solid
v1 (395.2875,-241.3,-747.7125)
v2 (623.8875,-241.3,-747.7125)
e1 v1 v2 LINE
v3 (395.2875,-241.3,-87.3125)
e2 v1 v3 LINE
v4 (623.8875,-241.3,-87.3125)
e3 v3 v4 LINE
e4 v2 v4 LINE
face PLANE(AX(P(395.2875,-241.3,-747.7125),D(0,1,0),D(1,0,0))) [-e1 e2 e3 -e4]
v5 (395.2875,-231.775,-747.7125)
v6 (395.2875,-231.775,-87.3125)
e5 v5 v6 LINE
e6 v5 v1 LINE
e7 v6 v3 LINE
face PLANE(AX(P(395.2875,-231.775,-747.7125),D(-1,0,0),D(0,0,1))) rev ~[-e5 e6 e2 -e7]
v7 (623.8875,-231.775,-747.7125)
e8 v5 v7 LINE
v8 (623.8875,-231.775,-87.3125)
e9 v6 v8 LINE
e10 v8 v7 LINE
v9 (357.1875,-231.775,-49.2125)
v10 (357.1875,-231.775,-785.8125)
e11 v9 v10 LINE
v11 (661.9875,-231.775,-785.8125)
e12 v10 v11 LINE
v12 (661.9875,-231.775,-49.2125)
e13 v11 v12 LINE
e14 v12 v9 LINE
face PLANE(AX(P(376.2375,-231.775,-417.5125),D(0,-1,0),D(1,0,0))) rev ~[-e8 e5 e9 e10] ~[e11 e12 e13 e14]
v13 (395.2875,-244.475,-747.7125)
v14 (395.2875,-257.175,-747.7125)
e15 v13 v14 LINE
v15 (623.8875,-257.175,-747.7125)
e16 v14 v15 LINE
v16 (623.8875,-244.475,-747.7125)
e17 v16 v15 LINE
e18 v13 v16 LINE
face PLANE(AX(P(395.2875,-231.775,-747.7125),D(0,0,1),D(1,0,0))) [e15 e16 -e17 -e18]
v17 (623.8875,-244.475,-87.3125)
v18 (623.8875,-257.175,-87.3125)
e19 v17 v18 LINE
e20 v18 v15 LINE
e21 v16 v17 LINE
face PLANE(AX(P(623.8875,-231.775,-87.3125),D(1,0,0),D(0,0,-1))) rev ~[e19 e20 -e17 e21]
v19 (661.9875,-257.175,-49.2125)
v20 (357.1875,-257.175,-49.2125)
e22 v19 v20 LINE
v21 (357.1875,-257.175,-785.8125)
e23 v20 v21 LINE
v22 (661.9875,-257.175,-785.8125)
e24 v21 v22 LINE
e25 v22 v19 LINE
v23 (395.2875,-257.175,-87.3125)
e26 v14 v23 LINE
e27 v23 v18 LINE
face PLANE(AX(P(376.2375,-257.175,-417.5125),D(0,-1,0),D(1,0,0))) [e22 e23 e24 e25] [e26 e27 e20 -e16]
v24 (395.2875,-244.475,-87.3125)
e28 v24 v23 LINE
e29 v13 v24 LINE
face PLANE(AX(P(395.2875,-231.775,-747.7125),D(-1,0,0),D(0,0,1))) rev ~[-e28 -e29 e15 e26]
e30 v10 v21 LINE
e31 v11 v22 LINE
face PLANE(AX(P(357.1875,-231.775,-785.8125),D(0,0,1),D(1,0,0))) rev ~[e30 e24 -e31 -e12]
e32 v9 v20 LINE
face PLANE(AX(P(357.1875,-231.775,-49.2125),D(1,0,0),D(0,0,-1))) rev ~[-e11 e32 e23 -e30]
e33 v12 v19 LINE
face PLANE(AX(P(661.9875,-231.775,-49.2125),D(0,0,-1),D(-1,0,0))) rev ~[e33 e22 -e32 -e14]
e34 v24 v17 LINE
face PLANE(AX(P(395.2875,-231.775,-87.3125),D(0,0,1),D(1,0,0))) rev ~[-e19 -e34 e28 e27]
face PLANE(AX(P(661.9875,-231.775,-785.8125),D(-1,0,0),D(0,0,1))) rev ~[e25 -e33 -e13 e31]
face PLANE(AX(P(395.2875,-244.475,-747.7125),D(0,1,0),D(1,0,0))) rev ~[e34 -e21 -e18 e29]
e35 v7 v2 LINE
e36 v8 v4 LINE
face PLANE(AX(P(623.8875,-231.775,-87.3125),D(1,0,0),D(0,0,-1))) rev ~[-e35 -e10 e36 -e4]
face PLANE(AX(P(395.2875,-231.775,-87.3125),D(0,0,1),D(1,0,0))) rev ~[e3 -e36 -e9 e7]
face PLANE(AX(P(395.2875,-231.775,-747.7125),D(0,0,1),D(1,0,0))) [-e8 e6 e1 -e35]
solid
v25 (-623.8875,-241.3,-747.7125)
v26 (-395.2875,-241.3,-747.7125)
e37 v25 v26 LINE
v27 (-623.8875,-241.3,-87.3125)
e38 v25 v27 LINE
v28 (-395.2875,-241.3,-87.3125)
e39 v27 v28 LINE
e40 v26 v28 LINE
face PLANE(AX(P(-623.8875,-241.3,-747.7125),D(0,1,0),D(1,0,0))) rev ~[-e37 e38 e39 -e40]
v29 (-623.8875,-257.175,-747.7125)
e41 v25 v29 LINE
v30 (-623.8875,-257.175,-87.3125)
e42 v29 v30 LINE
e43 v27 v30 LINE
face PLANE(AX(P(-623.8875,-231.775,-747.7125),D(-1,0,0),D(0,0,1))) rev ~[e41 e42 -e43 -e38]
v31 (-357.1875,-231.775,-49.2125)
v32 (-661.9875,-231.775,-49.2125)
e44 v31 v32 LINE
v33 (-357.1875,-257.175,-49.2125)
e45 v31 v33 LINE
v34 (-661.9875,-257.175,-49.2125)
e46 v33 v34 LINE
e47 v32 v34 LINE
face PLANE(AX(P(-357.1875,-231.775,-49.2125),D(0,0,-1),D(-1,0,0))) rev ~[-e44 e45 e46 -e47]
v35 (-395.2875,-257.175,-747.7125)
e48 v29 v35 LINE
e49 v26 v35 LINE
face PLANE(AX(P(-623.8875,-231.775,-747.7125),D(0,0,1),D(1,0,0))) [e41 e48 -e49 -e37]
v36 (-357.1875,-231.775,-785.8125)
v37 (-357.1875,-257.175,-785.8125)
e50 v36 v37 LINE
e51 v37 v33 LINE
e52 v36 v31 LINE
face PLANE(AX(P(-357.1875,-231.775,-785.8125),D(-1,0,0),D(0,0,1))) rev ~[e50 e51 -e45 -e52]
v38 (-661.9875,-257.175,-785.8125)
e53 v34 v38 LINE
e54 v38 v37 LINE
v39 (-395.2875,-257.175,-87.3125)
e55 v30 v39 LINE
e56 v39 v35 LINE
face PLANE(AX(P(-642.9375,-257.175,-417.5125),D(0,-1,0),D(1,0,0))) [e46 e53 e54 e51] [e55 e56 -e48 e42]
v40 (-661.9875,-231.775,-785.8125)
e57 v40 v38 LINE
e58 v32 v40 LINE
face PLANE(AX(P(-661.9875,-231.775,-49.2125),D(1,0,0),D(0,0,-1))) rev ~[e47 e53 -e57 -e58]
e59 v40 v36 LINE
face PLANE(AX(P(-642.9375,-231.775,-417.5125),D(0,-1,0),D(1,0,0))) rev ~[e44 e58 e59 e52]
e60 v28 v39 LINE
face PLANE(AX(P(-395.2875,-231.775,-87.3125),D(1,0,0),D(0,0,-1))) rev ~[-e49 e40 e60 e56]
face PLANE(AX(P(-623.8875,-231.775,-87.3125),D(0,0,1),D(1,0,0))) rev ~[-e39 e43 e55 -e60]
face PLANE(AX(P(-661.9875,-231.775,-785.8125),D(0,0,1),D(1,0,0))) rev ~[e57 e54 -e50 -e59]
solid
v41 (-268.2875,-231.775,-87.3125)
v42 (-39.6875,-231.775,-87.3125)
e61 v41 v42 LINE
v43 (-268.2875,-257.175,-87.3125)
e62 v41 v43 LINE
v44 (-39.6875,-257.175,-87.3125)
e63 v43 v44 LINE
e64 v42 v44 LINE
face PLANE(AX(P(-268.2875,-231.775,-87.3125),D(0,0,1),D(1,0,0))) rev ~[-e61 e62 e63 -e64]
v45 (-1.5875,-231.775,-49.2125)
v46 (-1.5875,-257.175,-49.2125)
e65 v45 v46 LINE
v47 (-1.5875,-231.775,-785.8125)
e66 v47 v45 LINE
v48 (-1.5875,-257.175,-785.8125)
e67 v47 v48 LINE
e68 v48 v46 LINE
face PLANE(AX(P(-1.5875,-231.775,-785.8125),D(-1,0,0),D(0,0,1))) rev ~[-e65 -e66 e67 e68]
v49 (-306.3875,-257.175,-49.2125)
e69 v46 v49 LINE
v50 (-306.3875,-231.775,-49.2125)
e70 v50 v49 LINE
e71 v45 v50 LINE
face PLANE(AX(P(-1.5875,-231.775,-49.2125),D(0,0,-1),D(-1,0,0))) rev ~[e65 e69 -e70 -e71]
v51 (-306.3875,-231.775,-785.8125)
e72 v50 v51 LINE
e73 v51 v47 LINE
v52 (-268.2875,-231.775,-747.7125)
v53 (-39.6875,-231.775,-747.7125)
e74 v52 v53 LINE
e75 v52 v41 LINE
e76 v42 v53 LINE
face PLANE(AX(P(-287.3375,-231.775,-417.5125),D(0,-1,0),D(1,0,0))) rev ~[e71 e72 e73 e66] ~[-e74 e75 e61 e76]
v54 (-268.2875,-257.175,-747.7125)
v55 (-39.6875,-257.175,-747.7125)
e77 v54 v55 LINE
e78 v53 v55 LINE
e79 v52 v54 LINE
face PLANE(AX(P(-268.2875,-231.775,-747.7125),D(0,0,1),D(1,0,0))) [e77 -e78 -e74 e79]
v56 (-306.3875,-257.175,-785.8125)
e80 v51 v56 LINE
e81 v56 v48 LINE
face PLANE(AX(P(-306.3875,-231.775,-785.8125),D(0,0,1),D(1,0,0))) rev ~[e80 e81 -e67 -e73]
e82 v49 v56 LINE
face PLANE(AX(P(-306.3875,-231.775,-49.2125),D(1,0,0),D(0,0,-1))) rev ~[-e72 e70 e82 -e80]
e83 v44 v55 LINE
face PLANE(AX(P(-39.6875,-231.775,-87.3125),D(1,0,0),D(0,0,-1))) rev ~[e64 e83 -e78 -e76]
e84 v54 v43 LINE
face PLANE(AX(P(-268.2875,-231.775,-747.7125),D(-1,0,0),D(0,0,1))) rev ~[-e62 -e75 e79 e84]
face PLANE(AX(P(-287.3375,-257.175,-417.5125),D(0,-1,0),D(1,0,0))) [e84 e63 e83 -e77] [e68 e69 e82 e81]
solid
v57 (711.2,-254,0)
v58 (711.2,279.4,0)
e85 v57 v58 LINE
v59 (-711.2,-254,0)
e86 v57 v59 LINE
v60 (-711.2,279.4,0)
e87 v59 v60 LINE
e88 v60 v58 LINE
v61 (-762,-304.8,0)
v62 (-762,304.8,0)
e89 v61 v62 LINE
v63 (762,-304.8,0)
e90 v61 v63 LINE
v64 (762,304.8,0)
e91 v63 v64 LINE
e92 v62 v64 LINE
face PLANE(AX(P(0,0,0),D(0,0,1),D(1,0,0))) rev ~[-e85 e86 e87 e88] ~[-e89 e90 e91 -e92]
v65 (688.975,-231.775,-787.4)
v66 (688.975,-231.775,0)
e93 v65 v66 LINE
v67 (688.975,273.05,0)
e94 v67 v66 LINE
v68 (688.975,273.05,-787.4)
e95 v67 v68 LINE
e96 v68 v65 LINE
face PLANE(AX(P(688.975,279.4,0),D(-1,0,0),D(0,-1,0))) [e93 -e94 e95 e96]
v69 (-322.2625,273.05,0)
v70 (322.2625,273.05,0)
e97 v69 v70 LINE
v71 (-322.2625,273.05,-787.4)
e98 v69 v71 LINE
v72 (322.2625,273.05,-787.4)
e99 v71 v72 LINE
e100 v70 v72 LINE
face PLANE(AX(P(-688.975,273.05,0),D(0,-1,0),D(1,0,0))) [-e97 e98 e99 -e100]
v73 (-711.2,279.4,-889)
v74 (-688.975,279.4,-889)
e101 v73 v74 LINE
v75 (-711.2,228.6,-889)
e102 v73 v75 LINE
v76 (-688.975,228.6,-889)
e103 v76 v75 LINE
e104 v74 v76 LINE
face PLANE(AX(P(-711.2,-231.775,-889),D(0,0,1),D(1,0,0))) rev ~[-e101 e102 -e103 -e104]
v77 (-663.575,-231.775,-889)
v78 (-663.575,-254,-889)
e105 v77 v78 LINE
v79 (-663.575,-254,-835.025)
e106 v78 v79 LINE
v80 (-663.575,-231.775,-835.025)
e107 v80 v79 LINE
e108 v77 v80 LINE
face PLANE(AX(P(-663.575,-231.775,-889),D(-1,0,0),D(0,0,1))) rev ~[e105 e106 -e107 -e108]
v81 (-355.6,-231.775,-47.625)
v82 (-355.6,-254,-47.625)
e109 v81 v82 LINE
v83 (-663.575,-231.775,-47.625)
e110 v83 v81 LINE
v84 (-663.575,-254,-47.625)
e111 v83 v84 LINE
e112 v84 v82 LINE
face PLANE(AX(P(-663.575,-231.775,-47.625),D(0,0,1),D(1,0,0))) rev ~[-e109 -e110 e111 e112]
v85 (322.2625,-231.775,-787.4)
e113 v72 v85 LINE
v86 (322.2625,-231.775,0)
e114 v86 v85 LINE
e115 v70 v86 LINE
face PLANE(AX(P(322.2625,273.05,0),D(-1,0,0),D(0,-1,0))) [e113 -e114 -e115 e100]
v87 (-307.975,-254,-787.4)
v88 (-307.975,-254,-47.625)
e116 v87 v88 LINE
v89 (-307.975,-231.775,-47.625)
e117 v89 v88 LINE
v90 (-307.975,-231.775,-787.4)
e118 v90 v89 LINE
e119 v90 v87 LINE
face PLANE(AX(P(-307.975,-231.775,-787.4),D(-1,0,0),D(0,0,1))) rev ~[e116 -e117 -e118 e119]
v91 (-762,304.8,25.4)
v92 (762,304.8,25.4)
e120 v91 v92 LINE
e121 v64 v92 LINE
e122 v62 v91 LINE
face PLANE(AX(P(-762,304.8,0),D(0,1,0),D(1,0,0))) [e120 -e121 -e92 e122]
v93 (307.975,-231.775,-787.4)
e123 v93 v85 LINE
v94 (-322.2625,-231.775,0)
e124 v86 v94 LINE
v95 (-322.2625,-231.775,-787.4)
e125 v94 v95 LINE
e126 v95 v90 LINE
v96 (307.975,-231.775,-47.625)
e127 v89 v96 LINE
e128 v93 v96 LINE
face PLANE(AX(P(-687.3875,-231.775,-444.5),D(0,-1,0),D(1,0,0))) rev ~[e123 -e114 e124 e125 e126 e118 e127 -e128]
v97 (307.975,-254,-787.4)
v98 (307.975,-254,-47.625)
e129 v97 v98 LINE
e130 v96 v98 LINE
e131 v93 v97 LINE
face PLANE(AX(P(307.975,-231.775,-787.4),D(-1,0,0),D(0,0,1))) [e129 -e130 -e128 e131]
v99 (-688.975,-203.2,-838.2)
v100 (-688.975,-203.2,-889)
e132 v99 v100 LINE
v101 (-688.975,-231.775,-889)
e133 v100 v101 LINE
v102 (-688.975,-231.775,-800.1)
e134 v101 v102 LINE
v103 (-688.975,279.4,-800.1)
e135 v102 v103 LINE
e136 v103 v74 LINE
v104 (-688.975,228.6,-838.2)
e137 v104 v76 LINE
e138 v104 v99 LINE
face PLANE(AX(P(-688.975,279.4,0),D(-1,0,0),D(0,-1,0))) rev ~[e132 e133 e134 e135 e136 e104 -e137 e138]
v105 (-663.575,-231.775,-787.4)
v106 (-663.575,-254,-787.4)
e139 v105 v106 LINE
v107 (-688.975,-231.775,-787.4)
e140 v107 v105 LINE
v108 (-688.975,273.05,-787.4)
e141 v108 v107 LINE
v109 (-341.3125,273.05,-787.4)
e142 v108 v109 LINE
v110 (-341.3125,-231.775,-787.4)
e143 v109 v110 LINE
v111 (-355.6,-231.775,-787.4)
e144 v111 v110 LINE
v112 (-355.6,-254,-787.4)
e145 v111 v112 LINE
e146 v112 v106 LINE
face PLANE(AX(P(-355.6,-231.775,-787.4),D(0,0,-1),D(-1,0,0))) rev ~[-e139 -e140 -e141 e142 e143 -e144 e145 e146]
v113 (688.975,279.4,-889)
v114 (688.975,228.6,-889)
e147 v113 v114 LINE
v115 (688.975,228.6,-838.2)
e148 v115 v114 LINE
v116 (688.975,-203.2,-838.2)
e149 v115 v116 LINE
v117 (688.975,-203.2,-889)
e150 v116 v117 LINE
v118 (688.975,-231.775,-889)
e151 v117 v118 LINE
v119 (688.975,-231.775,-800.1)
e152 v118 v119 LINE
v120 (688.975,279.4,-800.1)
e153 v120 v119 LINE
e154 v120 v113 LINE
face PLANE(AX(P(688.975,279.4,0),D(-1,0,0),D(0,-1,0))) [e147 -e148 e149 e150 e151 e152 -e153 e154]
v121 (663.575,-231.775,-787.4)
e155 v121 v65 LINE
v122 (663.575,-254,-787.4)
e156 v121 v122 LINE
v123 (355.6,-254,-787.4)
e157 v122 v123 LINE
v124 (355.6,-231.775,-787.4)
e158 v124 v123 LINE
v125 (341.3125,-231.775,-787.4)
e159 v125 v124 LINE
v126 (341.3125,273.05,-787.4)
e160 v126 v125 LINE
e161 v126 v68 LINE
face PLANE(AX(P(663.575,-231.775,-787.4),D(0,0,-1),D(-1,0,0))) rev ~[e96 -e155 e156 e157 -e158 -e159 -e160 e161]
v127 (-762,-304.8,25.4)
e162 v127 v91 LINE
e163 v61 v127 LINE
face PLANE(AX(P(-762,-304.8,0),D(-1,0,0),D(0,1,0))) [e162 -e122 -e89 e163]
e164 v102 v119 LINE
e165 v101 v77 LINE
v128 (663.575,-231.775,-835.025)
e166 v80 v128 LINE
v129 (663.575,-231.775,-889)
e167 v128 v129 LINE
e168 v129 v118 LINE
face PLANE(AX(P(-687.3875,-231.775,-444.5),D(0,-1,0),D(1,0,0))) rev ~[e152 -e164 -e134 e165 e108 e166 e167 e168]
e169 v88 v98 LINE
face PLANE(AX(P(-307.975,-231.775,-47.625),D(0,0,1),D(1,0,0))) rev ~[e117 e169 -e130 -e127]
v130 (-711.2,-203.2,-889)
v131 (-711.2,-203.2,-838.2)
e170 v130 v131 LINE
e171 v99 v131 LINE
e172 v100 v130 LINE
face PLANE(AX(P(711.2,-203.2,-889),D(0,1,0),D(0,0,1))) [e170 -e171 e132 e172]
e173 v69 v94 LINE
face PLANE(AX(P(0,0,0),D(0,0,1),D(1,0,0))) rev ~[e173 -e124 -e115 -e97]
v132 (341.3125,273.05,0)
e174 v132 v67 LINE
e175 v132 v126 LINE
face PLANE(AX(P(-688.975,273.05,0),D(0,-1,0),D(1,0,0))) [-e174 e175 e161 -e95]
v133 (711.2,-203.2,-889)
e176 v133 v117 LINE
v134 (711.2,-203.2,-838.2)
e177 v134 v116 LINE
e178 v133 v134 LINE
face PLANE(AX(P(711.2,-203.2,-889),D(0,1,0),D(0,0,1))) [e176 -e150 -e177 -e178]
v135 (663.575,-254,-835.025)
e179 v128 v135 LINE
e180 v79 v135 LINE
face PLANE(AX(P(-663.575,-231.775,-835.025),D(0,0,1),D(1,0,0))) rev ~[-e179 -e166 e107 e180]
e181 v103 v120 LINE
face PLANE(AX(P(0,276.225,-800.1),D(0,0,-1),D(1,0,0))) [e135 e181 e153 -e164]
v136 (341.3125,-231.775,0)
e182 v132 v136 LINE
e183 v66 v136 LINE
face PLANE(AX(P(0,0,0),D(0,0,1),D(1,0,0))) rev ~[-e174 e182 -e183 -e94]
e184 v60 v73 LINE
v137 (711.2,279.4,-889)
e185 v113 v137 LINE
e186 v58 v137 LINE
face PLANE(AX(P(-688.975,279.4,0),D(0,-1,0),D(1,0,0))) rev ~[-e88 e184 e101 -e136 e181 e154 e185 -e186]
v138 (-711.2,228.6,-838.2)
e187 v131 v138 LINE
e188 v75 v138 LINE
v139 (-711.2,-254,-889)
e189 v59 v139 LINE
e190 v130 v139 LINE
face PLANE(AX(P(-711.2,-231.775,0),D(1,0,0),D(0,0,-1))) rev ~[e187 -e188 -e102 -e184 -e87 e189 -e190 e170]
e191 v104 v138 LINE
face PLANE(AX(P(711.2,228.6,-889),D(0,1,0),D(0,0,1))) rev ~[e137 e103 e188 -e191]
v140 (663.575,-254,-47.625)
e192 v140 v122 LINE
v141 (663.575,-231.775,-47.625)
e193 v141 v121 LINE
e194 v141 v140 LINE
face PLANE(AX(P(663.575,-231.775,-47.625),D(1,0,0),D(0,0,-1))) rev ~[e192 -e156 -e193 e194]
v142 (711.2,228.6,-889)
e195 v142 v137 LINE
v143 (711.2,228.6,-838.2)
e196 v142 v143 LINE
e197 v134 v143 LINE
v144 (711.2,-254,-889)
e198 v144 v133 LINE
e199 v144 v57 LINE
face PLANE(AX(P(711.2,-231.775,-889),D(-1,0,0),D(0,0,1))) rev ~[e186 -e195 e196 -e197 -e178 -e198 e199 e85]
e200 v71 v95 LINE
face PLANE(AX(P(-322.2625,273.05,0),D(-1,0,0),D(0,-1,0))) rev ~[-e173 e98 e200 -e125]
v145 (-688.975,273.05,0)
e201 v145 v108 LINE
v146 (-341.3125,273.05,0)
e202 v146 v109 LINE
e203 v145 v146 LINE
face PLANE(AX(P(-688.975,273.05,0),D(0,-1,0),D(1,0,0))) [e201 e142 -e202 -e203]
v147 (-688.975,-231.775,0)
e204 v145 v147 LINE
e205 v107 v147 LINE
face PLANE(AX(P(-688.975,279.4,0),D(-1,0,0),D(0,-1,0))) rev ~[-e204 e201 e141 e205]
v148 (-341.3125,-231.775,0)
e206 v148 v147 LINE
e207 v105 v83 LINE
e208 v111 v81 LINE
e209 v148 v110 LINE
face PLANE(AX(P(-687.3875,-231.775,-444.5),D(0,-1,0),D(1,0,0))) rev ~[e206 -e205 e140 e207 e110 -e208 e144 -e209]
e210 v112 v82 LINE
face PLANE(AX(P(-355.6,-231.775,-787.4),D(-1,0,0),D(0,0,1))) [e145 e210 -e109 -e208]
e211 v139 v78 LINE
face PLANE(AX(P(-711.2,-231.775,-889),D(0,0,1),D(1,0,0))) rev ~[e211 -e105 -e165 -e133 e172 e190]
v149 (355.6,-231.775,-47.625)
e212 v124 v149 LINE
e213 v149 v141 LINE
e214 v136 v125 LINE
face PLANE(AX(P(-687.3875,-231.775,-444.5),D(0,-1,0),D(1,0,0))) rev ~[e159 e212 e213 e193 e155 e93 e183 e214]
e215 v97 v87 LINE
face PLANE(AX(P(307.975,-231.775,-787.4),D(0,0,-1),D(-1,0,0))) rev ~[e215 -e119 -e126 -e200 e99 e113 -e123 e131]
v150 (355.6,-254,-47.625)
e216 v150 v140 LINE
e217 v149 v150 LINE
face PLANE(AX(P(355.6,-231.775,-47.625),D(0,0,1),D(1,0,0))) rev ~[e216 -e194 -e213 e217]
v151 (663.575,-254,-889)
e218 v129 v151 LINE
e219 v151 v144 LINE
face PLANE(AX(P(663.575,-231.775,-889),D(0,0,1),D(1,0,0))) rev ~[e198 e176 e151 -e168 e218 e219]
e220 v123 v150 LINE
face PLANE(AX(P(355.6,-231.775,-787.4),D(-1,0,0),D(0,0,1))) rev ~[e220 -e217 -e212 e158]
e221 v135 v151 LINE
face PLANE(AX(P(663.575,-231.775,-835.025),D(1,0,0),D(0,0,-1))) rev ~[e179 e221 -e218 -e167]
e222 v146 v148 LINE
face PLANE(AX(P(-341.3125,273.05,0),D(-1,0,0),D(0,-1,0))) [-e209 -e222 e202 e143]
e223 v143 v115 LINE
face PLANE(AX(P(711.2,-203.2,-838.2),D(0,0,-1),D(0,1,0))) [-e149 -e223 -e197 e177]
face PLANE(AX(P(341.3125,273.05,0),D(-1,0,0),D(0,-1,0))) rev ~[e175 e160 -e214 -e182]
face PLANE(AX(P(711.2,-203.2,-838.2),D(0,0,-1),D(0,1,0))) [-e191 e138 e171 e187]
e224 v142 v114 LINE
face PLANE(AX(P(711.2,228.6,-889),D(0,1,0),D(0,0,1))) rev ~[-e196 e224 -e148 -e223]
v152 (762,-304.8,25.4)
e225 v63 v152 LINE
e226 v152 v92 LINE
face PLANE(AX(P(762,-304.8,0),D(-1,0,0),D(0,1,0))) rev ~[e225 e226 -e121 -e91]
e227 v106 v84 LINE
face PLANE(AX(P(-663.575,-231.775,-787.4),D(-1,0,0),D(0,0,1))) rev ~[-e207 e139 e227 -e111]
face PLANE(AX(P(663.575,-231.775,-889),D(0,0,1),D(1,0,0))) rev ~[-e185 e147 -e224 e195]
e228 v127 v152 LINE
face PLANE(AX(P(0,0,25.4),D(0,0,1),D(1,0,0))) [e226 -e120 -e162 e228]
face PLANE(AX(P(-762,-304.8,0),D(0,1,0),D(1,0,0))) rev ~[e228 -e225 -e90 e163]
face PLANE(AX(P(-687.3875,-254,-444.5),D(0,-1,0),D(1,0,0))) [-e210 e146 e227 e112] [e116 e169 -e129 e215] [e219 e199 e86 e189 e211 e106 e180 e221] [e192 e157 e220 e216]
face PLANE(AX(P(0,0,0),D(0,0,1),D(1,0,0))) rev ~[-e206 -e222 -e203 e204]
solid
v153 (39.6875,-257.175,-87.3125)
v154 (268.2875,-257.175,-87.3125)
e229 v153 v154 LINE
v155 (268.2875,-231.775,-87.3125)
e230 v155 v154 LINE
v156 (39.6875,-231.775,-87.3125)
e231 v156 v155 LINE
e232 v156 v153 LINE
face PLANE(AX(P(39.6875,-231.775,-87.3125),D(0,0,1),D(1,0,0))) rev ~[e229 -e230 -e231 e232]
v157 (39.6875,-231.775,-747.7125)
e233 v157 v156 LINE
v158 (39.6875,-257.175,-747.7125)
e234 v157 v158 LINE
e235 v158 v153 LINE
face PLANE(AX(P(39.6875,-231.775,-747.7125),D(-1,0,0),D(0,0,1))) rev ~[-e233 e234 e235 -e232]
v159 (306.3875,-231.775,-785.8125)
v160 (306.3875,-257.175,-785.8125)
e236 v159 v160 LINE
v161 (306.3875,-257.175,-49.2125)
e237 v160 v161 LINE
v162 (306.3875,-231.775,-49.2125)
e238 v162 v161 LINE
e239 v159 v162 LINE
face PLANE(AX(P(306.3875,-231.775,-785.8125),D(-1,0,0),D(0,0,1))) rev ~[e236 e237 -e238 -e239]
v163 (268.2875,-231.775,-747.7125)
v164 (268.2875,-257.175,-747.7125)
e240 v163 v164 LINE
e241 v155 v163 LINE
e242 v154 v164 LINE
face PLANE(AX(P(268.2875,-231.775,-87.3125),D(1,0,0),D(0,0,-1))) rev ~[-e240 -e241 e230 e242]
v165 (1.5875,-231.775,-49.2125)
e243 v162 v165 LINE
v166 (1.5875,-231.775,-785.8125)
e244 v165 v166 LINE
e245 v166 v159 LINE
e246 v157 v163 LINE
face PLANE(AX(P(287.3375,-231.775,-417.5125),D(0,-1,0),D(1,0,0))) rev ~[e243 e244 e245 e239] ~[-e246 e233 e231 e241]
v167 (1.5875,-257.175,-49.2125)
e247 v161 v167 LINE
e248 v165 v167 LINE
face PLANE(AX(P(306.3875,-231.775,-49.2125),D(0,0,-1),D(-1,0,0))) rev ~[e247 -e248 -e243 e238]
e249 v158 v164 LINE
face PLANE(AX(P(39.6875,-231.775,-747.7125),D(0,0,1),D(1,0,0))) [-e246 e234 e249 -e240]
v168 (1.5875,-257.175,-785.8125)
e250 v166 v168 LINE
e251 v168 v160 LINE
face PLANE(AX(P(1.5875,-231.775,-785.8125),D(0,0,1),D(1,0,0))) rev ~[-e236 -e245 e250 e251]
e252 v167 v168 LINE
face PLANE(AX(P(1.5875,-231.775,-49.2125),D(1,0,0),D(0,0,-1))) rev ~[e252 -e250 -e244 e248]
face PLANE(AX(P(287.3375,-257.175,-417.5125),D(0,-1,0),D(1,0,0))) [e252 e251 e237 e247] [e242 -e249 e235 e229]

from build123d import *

# Parameters (mm, degrees)
F0_W      = 1524
F0_H      = 609.6
F1_DEPTH  = 25.4
F2_W      = 22.225
F2_H      = 511.175
F3_DEPTH  = 889
F2_W_2    = 19.05
F2_H_2    = 504.825
F4_DEPTH  = 787.4
F6_W      = 1377.95
F6_H      = 504.825
F7_DEPTH  = 12.7
F9_W      = 47.625
F9_H      = 739.775
F10_DEPTH = 22.225
F11_W     = 228.6
F11_H     = 38.1
F12_DEPTH = 25.4
F13_W     = 1377.95
F13_H     = 6.35
F14_DEPTH = 800.1
F15_W     = 228.6
F15_H     = 9.525
F16_DEPTH = 660.4
F15_H_2   = 3.175
F17_DEPTH = 660.4
F18_W     = 431.8
F18_H     = 50.8
F19_DEPTH = 1473.201


with BuildPart() as f1:
    # F0 (on Top) → F1 (new body)
    with BuildSketch(Plane.XY):
        Rectangle(F0_W, F0_H)
    extrude(amount=F1_DEPTH)

    # F2 (on face) → F3 (join)
    with BuildSketch(Plane(origin=(0, 0, 0), x_dir=(1, 0, 0), z_dir=(0, 0, -1))):
        with Locations((-700.0875, -23.8125)):
            Rectangle(F2_W, F2_H)
        with Locations((700.0875, -23.8125)):
            Rectangle(F2_W, F2_H)
    extrude(amount=F3_DEPTH)

    # F2 (on face) → F4 (join)
    with BuildSketch(Plane(origin=(0, 0, 0), x_dir=(1, 0, 0), z_dir=(0, 0, -1))):
        with Locations((-700.0875, -23.8125)):
            Rectangle(F2_W, F2_H)
        with Locations((700.0875, -23.8125)):
            Rectangle(F2_W, F2_H)
        with Locations((-331.7875, -20.6375)):
            Rectangle(F2_W_2, F2_H_2)
        with Locations((331.7875, -20.6375)):
            Rectangle(F2_W_2, F2_H_2)
    extrude(amount=F4_DEPTH)

    # F6 (on offset) → F7 (join)
    with BuildSketch(Plane(origin=(0, 0, -787.4), x_dir=(1, 0, 0), z_dir=(0, 0, -1))):
        with Locations((0, -20.6375)):
            Rectangle(F6_W, F6_H)
    extrude(amount=F7_DEPTH)

    # F9 (on offset) → F10 (join)
    with BuildSketch(Plane.XZ.offset(231.775)):
        Polygon((-663.575, 0), (-711.2, 0), (-711.2, -889), (-663.575, -889), (-663.575, -835.025), (-663.575, -787.4), (-663.575, -47.625), align=None)
        Polygon((663.575, 0), (-663.575, 0), (-663.575, -47.625), (-355.6, -47.625), (-307.975, -47.625), (307.975, -47.625), (355.6, -47.625), (663.575, -47.625), align=None)
        Polygon((711.2, 0), (663.575, 0), (663.575, -47.625), (663.575, -787.4), (663.575, -835.025), (663.575, -889), (711.2, -889), align=None)
        Polygon((-355.6, -787.4), (-663.575, -787.4), (-663.575, -835.025), (663.575, -835.025), (663.575, -787.4), (355.6, -787.4), (307.975, -787.4), (-307.975, -787.4), align=None)
        with Locations((-331.7875, -417.5125)):
            Rectangle(F9_W, F9_H)
        with Locations((331.7875, -417.5125)):
            Rectangle(F9_W, F9_H)
    extrude(amount=F10_DEPTH)

    # F13 (on face) → F14 (join, through all)
    with BuildSketch(Plane(origin=(0, 0, 0), x_dir=(1, 0, 0), z_dir=(0, 0, -1))):
        with Locations((0, -276.225)):
            Rectangle(F13_W, F13_H)
    extrude(amount=F14_DEPTH)

    # F18 (on face) → F19 (cut, through all)
    with BuildSketch(Plane.YZ.offset(711.2)):
        with Locations((12.7, -863.6)):
            Rectangle(F18_W, F18_H)
    extrude(amount=-F19_DEPTH, mode=Mode.SUBTRACT)


with BuildPart() as f12:
    # F11 (on offset) → F12 (new body)
    with BuildSketch(Plane.XZ.offset(231.775)):
        Polygon((-623.8875, -49.2125), (-661.9875, -49.2125), (-661.9875, -785.8125), (-623.8875, -785.8125), (-623.8875, -747.7125), (-623.8875, -87.3125), align=None)
        with Locations((-509.5875, -68.2625)):
            Rectangle(F11_W, F11_H)
        Polygon((-357.1875, -49.2125), (-395.2875, -49.2125), (-395.2875, -87.3125), (-395.2875, -747.7125), (-395.2875, -785.8125), (-357.1875, -785.8125), align=None)
        with Locations((-509.5875, -766.7625)):
            Rectangle(F11_W, F11_H)
    extrude(amount=F12_DEPTH)

    # F15 (on face) → F16 (join, through all)
    with BuildSketch(Plane.XY.offset(-747.7125)):
        with Locations((-509.5875, -236.5375)):
            Rectangle(F15_W, F15_H)
    extrude(amount=F16_DEPTH)


with BuildPart() as f12b:
    # F11 (on offset) → F12, piece 2 (new body)
    with BuildSketch(Plane.XZ.offset(231.775)):
        Polygon((357.1875, -785.8125), (395.2875, -785.8125), (395.2875, -747.7125), (395.2875, -87.3125), (395.2875, -49.2125), (357.1875, -49.2125), align=None)
        with Locations((509.5875, -766.7625)):
            Rectangle(F11_W, F11_H)
        Polygon((623.8875, -747.7125), (623.8875, -785.8125), (661.9875, -785.8125), (661.9875, -49.2125), (623.8875, -49.2125), (623.8875, -87.3125), align=None)
        with Locations((509.5875, -68.2625)):
            Rectangle(F11_W, F11_H)
    extrude(amount=F12_DEPTH)

    # F15 (on face) → F17 (join, through all)
    with BuildSketch(Plane.XY.offset(-747.7125)):
        with Locations((509.5875, -242.8875)):
            Rectangle(F15_W, F15_H_2)
    extrude(amount=F17_DEPTH)


with BuildPart() as f12c:
    # F11 (on offset) → F12, piece 3 (new body)
    with BuildSketch(Plane.XZ.offset(231.775)):
        Polygon((-268.2875, -49.2125), (-306.3875, -49.2125), (-306.3875, -785.8125), (-268.2875, -785.8125), (-268.2875, -747.7125), (-268.2875, -87.3125), align=None)
        with Locations((-153.9875, -68.2625)):
            Rectangle(F11_W, F11_H)
        Polygon((-1.5875, -49.2125), (-39.6875, -49.2125), (-39.6875, -87.3125), (-39.6875, -747.7125), (-39.6875, -785.8125), (-1.5875, -785.8125), align=None)
        with Locations((-153.9875, -766.7625)):
            Rectangle(F11_W, F11_H)
    extrude(amount=F12_DEPTH)


with BuildPart() as f12d:
    # F11 (on offset) → F12, piece 4 (new body)
    with BuildSketch(Plane.XZ.offset(231.775)):
        Polygon((306.3875, -785.8125), (306.3875, -49.2125), (268.2875, -49.2125), (268.2875, -87.3125), (268.2875, -747.7125), (268.2875, -785.8125), align=None)
        with Locations((153.9875, -68.2625)):
            Rectangle(F11_W, F11_H)
        Polygon((39.6875, -87.3125), (39.6875, -49.2125), (1.5875, -49.2125), (1.5875, -785.8125), (39.6875, -785.8125), (39.6875, -747.7125), align=None)
        with Locations((153.9875, -766.7625)):
            Rectangle(F11_W, F11_H)
    extrude(amount=F12_DEPTH)


solid = Compound([f1.part, f12.part, f12b.part, f12c.part, f12d.part])
